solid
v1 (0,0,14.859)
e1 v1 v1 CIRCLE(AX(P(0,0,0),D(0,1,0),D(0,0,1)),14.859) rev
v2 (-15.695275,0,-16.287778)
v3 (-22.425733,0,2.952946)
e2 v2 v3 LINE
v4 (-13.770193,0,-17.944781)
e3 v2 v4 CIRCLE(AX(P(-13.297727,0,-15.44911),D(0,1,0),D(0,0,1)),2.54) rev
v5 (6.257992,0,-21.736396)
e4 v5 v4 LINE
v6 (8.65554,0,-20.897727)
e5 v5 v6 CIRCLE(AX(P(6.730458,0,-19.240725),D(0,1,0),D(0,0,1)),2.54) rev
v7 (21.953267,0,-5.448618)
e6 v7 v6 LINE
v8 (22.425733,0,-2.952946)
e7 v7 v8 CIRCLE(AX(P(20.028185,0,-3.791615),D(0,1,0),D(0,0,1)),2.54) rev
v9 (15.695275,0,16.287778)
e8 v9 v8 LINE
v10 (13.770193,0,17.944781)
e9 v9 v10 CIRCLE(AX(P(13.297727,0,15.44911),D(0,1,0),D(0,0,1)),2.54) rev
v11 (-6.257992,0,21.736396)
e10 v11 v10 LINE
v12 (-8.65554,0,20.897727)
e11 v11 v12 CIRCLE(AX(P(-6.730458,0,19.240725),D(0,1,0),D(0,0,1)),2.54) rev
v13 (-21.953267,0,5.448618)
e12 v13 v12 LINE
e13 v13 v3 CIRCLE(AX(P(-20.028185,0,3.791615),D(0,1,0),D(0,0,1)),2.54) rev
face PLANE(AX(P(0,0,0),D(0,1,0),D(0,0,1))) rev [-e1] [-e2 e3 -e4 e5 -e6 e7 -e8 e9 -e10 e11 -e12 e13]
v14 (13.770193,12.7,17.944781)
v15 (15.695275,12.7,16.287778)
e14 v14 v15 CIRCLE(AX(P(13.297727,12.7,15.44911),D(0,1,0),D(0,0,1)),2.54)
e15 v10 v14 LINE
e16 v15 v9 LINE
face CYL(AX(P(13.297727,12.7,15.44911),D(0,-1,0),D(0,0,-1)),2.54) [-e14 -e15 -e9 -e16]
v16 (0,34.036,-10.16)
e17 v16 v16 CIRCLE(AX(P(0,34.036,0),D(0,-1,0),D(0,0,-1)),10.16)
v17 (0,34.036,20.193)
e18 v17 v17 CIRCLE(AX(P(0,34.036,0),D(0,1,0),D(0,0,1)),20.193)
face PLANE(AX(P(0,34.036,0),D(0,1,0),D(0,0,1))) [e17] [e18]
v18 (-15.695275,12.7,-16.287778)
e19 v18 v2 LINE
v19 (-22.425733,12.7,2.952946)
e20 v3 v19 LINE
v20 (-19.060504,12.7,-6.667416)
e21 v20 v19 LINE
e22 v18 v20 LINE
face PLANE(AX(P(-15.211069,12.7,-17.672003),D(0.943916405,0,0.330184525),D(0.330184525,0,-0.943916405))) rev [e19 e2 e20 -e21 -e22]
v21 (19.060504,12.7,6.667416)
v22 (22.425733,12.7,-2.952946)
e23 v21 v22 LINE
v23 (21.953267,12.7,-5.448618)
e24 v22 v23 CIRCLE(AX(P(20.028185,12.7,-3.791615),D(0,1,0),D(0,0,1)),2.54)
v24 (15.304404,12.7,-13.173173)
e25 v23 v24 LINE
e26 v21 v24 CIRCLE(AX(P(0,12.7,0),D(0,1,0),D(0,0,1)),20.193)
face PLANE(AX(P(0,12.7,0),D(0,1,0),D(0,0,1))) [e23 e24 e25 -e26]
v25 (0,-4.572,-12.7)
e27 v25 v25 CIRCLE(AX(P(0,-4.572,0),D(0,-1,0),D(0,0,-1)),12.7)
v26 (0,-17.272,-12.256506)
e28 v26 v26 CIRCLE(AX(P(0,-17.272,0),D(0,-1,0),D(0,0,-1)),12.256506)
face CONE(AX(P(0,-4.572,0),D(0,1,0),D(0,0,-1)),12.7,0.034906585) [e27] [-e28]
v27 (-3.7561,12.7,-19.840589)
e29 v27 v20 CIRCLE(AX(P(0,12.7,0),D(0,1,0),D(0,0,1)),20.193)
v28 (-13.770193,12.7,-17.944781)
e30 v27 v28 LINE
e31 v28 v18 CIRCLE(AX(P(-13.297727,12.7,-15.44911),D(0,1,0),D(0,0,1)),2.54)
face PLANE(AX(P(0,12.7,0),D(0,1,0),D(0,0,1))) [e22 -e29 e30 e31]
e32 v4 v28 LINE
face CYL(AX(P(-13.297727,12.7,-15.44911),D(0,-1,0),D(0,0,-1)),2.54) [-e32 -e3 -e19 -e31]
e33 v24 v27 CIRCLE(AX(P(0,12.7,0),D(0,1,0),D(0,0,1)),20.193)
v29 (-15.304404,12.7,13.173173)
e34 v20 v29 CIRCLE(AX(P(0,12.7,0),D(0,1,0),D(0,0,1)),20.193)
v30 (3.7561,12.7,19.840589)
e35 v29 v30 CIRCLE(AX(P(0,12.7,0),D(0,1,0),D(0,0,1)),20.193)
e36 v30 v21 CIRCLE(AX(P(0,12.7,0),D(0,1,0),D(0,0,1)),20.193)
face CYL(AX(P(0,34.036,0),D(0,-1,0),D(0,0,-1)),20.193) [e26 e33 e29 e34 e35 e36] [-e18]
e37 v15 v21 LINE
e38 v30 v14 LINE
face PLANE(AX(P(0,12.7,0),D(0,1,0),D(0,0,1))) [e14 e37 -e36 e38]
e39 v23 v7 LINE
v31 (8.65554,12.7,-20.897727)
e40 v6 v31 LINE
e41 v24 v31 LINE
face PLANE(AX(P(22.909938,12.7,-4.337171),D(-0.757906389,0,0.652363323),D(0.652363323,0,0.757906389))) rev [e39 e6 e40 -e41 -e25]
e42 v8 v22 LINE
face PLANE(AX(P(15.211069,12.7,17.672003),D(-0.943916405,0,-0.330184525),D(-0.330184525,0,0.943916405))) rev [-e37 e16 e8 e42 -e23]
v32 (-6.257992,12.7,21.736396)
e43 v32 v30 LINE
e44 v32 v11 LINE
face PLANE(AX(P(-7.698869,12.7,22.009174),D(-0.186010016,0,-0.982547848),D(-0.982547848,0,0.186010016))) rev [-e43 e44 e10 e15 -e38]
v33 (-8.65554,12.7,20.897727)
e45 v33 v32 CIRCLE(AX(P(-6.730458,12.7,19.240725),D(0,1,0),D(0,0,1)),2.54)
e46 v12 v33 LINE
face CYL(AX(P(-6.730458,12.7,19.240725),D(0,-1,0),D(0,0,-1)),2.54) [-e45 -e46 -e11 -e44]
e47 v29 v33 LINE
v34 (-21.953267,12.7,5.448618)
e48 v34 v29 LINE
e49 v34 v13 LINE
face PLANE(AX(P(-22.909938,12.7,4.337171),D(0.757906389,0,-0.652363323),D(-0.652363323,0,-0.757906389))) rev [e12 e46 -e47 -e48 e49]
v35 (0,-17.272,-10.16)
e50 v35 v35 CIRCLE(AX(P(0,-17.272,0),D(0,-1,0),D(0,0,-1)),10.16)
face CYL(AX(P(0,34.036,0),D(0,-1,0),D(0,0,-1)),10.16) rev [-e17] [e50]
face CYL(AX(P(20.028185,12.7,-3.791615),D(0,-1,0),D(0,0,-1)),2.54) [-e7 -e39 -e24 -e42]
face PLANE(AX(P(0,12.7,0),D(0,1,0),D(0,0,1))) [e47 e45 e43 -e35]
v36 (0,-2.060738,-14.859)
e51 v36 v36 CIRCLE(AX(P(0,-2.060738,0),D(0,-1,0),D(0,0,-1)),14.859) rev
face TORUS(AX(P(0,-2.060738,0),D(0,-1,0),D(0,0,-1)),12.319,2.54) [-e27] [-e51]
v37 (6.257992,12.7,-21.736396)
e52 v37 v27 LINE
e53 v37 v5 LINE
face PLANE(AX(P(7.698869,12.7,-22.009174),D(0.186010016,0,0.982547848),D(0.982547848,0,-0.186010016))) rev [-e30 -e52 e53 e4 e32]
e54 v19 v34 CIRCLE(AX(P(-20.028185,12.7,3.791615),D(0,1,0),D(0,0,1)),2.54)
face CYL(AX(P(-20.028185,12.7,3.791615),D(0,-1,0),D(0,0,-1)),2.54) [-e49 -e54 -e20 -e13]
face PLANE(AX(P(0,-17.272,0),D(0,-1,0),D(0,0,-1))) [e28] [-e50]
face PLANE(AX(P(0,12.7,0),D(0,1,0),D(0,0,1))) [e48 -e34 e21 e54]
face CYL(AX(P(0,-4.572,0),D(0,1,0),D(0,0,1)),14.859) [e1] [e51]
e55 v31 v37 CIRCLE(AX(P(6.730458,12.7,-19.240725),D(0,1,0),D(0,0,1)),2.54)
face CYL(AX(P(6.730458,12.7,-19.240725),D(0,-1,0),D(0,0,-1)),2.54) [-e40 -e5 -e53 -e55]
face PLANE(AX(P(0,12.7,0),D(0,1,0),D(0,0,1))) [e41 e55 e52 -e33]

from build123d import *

# Parameters (mm, degrees)
BOSS_EXTRUDE1_DEPTH = 12.7
SKETCH2_R           = 20.193
BOSS_EXTRUDE2_DEPTH = 21.336
SKETCH3_R           = 14.859
BOSS_EXTRUDE3_DEPTH = 4.572
SKETCH4_R           = 12.7
BOSS_EXTRUDE4_DEPTH = 12.7
BOSS_EXTRUDE4_TAPER = 2
SKETCH5_R           = 10.16
CUT_EXTRUDE1_DEPTH  = 61.347161428
FILLET1_R           = 2.54


with BuildPart() as part:
    # Sketch1 → Boss-Extrude1 (new body)
    with BuildSketch(Plane(origin=(0, 0, 0), x_dir=(1, 0, 0), z_dir=(0, 1, 0))):
        Polygon((15.211069479, -17.672003206), (22.909938452, 4.337170984), (7.698868973, 22.00917419), (-15.211069479, 17.672003206), (-22.909938452, -4.337170984), (-7.698868973, -22.00917419), align=None)
    extrude(amount=BOSS_EXTRUDE1_DEPTH)

    # Sketch2 → Boss-Extrude2 (add)
    with BuildSketch(Plane(origin=(0, 12.7, 0), x_dir=(1, 0, 0), z_dir=(0, 1, 0))):
        with Locations(Location((0, 0, 0), (0, 0, 100.720024221))):
            Circle(SKETCH2_R)
    extrude(amount=BOSS_EXTRUDE2_DEPTH)

    # Sketch3 → Boss-Extrude3 (add)
    with BuildSketch(Plane.XZ):
        with Locations(Location((0, 0, 0), (0, 0, 90))):
            Circle(SKETCH3_R)
    extrude(amount=BOSS_EXTRUDE3_DEPTH)

    # Sketch4 → Boss-Extrude4 (add)
    with BuildSketch(Plane.XZ.offset(4.572)):
        Circle(SKETCH4_R)
    extrude(amount=BOSS_EXTRUDE4_DEPTH, taper=BOSS_EXTRUDE4_TAPER)

    # Sketch5 → Cut-Extrude1 (cut, through all)
    with BuildSketch(Plane.XZ.offset(17.272)):
        with Locations(Location((0, 0, 0), (0, 0, 270))):
            Circle(SKETCH5_R)
    extrude(amount=-CUT_EXTRUDE1_DEPTH, mode=Mode.SUBTRACT)

    # Fillet1
    # the kernel refuses this fillet: 2.54 mm, written as the material it takes off along each edge
    with BuildSketch(Plane(origin=(-7.698868973, -3.666174209, 22.00917419), x_dir=(0.9825478481724581, 0, -0.18601001599825806), z_dir=(0, 1, 0)), Plane(origin=(-22.909938452, -3.666174209, 4.337170984), x_dir=(0.6523633232990701, 0, 0.7579063889519556), z_dir=(0, 1, 0)), Plane(origin=(15.211069479, -3.666174209, 17.672003206), x_dir=(0.3301845248733872, 0, -0.9439164049502137), z_dir=(0, 1, 0))) as fillet1_piece_1:
        with BuildLine():
            CenterArc((FILLET1_R * 0.57735026919, FILLET1_R), FILLET1_R, 210, 60)
            Line((-FILLET1_R * 0.288675134595, FILLET1_R * 0.5), (-FILLET1_R * 0.305995642671, FILLET1_R * 0.49))
            Line((-FILLET1_R * 0.305995642671, FILLET1_R * 0.49), (-FILLET1_R * 0.0115470053838, -FILLET1_R * 0.02))
            Line((-FILLET1_R * 0.0115470053838, -FILLET1_R * 0.02), (FILLET1_R * 0.57735026919, -FILLET1_R * 0.02))
            Line((FILLET1_R * 0.57735026919, -FILLET1_R * 0.02), (FILLET1_R * 0.57735026919, 0))
        make_face()
    extrude(amount=20.032348419, mode=Mode.SUBTRACT)
    with BuildSketch(Plane(origin=(-15.211069479, -3.666174209, -17.672003206), x_dir=(0.9825478481724584, 0, -0.18601001599825617), z_dir=(0, 1, 0)), Plane(origin=(7.698868973, -3.666174209, -22.00917419), x_dir=(0.6523633232990698, 0, 0.7579063889519558), z_dir=(0, 1, 0)), Plane(origin=(22.909938452, -3.666174209, -4.337170984), x_dir=(-0.33018452487338784, 0, 0.9439164049502133), z_dir=(0, 1, 0))) as fillet1_piece_2:
        with BuildLine():
            CenterArc((FILLET1_R * 0.57735026919, -FILLET1_R), FILLET1_R, 90, 60)
            Line((-FILLET1_R * 0.288675134595, -FILLET1_R * 0.5), (-FILLET1_R * 0.305995642671, -FILLET1_R * 0.49))
            Line((-FILLET1_R * 0.305995642671, -FILLET1_R * 0.49), (-FILLET1_R * 0.0115470053838, FILLET1_R * 0.02))
            Line((-FILLET1_R * 0.0115470053838, FILLET1_R * 0.02), (FILLET1_R * 0.57735026919, FILLET1_R * 0.02))
            Line((FILLET1_R * 0.57735026919, FILLET1_R * 0.02), (FILLET1_R * 0.57735026919, 0))
        make_face()
    extrude(amount=20.032348419, mode=Mode.SUBTRACT)
    with BuildSketch(Plane(origin=(0, -4.572, 0), x_dir=(0, 0, 1), z_dir=(1, 0, 0))) as fillet1_piece_3:
        with BuildLine():
            CenterArc((12.319, -2.511262432), FILLET1_R, 0, 81.373073441)
            Line((12.7, 0), (12.70762, 0.050225249))
            ThreePointArc((12.70762, 0.050225249), (13.7795, 0.0508), (14.859, 0.0508))
            Line((14.859, 0.0508), (14.9098, 0))
            Line((14.9098, 0), (14.9098, -2.511262432))
            Line((14.9098, -2.511262432), (14.859, -2.511262432))
        make_face()
    revolve(axis=Axis((0, -4.572, 0), (0, -1, 0)), mode=Mode.SUBTRACT)


solid = part.part
